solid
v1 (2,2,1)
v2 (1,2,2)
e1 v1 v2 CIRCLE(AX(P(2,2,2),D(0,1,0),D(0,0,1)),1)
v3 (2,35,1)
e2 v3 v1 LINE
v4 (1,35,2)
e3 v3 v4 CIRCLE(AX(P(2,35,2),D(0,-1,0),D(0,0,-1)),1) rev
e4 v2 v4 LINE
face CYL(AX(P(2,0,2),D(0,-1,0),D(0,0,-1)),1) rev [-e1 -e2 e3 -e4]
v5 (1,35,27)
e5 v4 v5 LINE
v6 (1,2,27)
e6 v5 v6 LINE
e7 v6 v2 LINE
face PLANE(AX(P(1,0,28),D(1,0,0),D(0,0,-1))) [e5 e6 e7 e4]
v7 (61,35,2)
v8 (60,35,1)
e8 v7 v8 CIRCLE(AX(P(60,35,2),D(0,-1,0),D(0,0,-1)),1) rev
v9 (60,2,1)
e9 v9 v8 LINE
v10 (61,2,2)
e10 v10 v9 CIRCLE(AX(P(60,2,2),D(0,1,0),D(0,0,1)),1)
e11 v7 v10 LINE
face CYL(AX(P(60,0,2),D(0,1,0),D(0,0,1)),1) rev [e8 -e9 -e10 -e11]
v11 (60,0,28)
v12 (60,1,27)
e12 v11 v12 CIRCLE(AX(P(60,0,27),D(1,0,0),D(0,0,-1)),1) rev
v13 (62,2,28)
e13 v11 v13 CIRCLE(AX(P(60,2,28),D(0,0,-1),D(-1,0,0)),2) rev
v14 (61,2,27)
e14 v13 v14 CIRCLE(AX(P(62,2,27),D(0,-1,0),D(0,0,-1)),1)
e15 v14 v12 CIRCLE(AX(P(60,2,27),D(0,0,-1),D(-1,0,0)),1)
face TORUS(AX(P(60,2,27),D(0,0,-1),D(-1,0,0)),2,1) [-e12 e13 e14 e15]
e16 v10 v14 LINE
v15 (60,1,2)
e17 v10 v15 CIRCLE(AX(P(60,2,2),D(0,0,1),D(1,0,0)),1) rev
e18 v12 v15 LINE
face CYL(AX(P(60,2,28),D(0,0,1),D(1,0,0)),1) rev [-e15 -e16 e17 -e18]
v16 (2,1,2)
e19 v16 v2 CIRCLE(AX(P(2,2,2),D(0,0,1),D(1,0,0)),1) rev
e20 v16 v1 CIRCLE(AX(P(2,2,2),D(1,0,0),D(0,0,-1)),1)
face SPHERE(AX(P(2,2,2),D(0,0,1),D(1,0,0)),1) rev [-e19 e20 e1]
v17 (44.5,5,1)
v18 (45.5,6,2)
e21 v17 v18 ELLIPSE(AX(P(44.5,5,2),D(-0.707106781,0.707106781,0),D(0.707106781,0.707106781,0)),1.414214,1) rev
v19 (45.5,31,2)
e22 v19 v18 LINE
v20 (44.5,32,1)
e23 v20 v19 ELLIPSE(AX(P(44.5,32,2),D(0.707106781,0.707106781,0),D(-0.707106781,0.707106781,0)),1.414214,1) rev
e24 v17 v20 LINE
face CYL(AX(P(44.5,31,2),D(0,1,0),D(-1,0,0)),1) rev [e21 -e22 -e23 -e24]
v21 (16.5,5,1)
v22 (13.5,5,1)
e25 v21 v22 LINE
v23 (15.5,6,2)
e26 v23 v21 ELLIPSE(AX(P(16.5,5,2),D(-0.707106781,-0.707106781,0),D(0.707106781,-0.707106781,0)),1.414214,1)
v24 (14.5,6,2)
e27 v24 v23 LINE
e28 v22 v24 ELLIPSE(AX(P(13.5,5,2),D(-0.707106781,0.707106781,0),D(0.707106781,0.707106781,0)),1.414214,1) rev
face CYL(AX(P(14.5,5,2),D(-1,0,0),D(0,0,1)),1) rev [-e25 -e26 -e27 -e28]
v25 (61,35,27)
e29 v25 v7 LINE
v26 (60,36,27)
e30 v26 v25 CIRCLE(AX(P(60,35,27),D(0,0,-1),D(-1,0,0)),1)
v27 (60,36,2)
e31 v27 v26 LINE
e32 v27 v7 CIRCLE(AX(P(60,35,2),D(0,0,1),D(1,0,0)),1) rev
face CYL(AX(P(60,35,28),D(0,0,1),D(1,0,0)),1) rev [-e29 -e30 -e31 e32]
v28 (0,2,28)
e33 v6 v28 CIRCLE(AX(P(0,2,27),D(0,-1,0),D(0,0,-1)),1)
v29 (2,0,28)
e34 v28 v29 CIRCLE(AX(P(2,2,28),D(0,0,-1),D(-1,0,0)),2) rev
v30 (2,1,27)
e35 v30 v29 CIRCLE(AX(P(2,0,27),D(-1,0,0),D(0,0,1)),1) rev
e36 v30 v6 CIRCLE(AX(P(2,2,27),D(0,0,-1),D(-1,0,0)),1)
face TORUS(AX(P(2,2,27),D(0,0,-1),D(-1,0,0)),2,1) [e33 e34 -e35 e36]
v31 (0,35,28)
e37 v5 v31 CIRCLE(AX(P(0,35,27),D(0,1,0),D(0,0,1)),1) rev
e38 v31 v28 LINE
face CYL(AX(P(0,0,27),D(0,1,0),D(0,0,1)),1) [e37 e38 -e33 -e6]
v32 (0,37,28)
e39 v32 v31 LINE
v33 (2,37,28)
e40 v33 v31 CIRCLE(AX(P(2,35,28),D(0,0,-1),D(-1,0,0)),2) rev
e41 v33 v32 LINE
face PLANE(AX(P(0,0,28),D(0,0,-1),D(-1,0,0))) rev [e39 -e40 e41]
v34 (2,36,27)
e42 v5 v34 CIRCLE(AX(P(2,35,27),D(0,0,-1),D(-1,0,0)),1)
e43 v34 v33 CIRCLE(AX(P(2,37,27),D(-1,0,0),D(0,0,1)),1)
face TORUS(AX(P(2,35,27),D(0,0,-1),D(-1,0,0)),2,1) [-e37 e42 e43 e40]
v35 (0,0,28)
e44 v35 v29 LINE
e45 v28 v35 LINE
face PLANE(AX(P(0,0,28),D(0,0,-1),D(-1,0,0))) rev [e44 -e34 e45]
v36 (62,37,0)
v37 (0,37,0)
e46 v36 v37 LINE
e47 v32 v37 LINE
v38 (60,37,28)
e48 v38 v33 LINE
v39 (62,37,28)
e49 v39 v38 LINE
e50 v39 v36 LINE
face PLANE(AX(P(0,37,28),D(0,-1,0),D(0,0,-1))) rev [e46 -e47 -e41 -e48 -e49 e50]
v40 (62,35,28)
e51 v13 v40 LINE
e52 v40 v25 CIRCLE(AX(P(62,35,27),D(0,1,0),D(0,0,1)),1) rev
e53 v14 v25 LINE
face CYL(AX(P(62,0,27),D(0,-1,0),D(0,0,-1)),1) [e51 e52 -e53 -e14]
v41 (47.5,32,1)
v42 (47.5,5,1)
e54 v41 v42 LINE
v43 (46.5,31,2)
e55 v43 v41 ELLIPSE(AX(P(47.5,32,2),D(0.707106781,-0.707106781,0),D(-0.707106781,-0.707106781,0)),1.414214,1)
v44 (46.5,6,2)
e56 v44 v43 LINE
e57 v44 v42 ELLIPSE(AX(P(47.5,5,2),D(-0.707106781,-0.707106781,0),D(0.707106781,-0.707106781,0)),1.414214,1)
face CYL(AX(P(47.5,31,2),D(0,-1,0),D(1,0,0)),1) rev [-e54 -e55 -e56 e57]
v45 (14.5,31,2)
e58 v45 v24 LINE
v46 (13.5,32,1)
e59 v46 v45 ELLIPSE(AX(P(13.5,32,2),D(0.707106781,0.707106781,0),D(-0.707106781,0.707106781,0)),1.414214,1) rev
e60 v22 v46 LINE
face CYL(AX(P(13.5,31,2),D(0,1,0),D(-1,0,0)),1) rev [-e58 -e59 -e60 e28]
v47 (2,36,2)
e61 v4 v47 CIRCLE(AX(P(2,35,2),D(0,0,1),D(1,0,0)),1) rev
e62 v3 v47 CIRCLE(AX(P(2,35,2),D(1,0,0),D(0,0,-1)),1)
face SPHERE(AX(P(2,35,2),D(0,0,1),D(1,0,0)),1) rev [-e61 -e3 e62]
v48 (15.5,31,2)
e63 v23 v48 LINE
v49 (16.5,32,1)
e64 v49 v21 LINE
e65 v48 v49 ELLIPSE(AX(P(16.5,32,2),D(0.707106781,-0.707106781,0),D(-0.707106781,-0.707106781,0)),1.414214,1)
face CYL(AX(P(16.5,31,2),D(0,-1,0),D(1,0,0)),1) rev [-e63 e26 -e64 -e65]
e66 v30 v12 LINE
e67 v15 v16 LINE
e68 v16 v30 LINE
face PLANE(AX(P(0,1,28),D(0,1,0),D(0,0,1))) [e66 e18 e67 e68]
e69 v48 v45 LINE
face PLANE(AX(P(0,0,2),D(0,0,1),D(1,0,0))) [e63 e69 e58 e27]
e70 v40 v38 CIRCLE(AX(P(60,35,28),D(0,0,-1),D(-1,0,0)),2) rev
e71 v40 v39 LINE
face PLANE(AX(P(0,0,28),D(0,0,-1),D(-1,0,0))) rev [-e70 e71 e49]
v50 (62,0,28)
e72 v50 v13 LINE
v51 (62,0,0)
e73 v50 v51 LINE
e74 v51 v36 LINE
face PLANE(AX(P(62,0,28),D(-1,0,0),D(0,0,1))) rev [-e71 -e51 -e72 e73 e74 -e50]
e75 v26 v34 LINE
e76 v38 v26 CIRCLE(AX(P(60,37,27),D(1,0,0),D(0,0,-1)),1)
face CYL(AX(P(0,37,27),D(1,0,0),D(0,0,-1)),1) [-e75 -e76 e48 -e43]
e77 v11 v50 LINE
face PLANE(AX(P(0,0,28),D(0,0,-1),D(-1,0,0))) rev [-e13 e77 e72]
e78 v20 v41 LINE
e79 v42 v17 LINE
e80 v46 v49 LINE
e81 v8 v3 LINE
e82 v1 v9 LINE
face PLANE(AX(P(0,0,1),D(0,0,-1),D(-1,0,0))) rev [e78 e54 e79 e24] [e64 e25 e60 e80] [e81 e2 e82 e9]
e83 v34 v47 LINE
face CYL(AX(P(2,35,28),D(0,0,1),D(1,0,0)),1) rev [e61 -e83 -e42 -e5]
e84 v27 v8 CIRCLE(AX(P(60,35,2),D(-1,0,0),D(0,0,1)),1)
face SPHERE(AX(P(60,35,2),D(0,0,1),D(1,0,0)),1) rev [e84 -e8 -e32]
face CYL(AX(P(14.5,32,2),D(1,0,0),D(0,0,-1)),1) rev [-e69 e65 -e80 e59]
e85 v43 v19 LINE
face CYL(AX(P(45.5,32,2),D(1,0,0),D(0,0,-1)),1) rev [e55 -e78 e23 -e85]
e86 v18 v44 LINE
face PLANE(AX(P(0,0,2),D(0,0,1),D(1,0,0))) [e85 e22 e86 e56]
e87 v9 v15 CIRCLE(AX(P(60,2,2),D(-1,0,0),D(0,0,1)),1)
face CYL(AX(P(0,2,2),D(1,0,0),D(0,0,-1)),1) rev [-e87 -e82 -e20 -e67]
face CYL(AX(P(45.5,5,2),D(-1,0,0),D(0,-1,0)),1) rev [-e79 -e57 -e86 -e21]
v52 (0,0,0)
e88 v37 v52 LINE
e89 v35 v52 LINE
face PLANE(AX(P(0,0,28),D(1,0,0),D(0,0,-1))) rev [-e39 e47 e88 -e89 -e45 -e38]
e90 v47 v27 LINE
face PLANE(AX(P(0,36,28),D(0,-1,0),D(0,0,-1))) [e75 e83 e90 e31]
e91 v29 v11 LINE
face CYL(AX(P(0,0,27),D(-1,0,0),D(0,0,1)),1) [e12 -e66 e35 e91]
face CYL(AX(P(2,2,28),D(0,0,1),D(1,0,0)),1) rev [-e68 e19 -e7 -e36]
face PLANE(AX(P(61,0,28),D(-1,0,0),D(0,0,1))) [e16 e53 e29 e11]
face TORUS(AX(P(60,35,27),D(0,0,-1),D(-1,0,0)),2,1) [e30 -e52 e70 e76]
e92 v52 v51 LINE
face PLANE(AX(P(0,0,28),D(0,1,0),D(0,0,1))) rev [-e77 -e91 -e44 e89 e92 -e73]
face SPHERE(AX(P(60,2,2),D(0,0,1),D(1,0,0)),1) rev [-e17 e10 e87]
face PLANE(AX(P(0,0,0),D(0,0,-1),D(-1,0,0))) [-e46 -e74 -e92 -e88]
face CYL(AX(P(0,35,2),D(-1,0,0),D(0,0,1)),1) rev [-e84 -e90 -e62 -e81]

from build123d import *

# Parameters (mm, degrees)
ESQUISSE1_W        = 62
ESQUISSE1_H        = 37
BOSS_EXTRU_1_DEPTH = 28
COQUE1_T           = -1
CONG_1_R           = 1
ESQUISSE2_W        = 1
ESQUISSE2_H        = 25
BOSS_EXTRU_2_DEPTH = 1
CONG_2_R           = 1


with BuildPart() as part:
    # Esquisse1 → Boss.-Extru.1 (new body)
    with BuildSketch(Plane.XY):
        with Locations((31, 18.5)):
            Rectangle(ESQUISSE1_W, ESQUISSE1_H)
    extrude(amount=BOSS_EXTRU_1_DEPTH)

    # Coque1
    coque1_openings = [part.faces().sort_by_distance(p)[0] for p in [
        (31, 18.5, 28),
    ]]
    offset(amount=COQUE1_T, openings=coque1_openings, kind=Kind.INTERSECTION)

    # Congé1
    cong_1_edges = [part.edges().sort_by_distance(p)[0] for p in [
        (1, 18.5, 1),
        (1, 36, 14.5),
        (31, 1, 1),
        (1, 1, 14.5),
        (61, 18.5, 1),
        (61, 1, 14.5),
        (31, 36, 1),
        (61, 36, 14.5),
        (1, 18.5, 28),
        (31, 1, 28),
        (61, 18.5, 28),
        (31, 36, 28),
    ]]
    fillet(cong_1_edges, radius=CONG_1_R - 0.0001)  # a hair under: the kernel refuses the full size

    # Esquisse2 → Boss.-Extru.2 (add)
    with BuildSketch(Plane.XY.offset(1)):
        with Locations((15, 18.5)):
            Rectangle(ESQUISSE2_W, ESQUISSE2_H)
        with Locations((46, 18.5)):
            Rectangle(ESQUISSE2_W, ESQUISSE2_H)
    extrude(amount=BOSS_EXTRU_2_DEPTH)

    # Congé2
    cong_2_edges = [part.edges().sort_by_distance(p)[0] for p in [
        (46, 31, 1),
        (15, 31, 1),
        (46, 6, 1),
        (15, 6, 1),
        (46.5, 18.5, 1),
        (15.5, 18.5, 1),
        (45.5, 18.5, 1),
        (14.5, 18.5, 1),
    ]]
    fillet(cong_2_edges, radius=CONG_2_R - 0.0001)  # a hair under: the kernel refuses the full size


solid = part.part
